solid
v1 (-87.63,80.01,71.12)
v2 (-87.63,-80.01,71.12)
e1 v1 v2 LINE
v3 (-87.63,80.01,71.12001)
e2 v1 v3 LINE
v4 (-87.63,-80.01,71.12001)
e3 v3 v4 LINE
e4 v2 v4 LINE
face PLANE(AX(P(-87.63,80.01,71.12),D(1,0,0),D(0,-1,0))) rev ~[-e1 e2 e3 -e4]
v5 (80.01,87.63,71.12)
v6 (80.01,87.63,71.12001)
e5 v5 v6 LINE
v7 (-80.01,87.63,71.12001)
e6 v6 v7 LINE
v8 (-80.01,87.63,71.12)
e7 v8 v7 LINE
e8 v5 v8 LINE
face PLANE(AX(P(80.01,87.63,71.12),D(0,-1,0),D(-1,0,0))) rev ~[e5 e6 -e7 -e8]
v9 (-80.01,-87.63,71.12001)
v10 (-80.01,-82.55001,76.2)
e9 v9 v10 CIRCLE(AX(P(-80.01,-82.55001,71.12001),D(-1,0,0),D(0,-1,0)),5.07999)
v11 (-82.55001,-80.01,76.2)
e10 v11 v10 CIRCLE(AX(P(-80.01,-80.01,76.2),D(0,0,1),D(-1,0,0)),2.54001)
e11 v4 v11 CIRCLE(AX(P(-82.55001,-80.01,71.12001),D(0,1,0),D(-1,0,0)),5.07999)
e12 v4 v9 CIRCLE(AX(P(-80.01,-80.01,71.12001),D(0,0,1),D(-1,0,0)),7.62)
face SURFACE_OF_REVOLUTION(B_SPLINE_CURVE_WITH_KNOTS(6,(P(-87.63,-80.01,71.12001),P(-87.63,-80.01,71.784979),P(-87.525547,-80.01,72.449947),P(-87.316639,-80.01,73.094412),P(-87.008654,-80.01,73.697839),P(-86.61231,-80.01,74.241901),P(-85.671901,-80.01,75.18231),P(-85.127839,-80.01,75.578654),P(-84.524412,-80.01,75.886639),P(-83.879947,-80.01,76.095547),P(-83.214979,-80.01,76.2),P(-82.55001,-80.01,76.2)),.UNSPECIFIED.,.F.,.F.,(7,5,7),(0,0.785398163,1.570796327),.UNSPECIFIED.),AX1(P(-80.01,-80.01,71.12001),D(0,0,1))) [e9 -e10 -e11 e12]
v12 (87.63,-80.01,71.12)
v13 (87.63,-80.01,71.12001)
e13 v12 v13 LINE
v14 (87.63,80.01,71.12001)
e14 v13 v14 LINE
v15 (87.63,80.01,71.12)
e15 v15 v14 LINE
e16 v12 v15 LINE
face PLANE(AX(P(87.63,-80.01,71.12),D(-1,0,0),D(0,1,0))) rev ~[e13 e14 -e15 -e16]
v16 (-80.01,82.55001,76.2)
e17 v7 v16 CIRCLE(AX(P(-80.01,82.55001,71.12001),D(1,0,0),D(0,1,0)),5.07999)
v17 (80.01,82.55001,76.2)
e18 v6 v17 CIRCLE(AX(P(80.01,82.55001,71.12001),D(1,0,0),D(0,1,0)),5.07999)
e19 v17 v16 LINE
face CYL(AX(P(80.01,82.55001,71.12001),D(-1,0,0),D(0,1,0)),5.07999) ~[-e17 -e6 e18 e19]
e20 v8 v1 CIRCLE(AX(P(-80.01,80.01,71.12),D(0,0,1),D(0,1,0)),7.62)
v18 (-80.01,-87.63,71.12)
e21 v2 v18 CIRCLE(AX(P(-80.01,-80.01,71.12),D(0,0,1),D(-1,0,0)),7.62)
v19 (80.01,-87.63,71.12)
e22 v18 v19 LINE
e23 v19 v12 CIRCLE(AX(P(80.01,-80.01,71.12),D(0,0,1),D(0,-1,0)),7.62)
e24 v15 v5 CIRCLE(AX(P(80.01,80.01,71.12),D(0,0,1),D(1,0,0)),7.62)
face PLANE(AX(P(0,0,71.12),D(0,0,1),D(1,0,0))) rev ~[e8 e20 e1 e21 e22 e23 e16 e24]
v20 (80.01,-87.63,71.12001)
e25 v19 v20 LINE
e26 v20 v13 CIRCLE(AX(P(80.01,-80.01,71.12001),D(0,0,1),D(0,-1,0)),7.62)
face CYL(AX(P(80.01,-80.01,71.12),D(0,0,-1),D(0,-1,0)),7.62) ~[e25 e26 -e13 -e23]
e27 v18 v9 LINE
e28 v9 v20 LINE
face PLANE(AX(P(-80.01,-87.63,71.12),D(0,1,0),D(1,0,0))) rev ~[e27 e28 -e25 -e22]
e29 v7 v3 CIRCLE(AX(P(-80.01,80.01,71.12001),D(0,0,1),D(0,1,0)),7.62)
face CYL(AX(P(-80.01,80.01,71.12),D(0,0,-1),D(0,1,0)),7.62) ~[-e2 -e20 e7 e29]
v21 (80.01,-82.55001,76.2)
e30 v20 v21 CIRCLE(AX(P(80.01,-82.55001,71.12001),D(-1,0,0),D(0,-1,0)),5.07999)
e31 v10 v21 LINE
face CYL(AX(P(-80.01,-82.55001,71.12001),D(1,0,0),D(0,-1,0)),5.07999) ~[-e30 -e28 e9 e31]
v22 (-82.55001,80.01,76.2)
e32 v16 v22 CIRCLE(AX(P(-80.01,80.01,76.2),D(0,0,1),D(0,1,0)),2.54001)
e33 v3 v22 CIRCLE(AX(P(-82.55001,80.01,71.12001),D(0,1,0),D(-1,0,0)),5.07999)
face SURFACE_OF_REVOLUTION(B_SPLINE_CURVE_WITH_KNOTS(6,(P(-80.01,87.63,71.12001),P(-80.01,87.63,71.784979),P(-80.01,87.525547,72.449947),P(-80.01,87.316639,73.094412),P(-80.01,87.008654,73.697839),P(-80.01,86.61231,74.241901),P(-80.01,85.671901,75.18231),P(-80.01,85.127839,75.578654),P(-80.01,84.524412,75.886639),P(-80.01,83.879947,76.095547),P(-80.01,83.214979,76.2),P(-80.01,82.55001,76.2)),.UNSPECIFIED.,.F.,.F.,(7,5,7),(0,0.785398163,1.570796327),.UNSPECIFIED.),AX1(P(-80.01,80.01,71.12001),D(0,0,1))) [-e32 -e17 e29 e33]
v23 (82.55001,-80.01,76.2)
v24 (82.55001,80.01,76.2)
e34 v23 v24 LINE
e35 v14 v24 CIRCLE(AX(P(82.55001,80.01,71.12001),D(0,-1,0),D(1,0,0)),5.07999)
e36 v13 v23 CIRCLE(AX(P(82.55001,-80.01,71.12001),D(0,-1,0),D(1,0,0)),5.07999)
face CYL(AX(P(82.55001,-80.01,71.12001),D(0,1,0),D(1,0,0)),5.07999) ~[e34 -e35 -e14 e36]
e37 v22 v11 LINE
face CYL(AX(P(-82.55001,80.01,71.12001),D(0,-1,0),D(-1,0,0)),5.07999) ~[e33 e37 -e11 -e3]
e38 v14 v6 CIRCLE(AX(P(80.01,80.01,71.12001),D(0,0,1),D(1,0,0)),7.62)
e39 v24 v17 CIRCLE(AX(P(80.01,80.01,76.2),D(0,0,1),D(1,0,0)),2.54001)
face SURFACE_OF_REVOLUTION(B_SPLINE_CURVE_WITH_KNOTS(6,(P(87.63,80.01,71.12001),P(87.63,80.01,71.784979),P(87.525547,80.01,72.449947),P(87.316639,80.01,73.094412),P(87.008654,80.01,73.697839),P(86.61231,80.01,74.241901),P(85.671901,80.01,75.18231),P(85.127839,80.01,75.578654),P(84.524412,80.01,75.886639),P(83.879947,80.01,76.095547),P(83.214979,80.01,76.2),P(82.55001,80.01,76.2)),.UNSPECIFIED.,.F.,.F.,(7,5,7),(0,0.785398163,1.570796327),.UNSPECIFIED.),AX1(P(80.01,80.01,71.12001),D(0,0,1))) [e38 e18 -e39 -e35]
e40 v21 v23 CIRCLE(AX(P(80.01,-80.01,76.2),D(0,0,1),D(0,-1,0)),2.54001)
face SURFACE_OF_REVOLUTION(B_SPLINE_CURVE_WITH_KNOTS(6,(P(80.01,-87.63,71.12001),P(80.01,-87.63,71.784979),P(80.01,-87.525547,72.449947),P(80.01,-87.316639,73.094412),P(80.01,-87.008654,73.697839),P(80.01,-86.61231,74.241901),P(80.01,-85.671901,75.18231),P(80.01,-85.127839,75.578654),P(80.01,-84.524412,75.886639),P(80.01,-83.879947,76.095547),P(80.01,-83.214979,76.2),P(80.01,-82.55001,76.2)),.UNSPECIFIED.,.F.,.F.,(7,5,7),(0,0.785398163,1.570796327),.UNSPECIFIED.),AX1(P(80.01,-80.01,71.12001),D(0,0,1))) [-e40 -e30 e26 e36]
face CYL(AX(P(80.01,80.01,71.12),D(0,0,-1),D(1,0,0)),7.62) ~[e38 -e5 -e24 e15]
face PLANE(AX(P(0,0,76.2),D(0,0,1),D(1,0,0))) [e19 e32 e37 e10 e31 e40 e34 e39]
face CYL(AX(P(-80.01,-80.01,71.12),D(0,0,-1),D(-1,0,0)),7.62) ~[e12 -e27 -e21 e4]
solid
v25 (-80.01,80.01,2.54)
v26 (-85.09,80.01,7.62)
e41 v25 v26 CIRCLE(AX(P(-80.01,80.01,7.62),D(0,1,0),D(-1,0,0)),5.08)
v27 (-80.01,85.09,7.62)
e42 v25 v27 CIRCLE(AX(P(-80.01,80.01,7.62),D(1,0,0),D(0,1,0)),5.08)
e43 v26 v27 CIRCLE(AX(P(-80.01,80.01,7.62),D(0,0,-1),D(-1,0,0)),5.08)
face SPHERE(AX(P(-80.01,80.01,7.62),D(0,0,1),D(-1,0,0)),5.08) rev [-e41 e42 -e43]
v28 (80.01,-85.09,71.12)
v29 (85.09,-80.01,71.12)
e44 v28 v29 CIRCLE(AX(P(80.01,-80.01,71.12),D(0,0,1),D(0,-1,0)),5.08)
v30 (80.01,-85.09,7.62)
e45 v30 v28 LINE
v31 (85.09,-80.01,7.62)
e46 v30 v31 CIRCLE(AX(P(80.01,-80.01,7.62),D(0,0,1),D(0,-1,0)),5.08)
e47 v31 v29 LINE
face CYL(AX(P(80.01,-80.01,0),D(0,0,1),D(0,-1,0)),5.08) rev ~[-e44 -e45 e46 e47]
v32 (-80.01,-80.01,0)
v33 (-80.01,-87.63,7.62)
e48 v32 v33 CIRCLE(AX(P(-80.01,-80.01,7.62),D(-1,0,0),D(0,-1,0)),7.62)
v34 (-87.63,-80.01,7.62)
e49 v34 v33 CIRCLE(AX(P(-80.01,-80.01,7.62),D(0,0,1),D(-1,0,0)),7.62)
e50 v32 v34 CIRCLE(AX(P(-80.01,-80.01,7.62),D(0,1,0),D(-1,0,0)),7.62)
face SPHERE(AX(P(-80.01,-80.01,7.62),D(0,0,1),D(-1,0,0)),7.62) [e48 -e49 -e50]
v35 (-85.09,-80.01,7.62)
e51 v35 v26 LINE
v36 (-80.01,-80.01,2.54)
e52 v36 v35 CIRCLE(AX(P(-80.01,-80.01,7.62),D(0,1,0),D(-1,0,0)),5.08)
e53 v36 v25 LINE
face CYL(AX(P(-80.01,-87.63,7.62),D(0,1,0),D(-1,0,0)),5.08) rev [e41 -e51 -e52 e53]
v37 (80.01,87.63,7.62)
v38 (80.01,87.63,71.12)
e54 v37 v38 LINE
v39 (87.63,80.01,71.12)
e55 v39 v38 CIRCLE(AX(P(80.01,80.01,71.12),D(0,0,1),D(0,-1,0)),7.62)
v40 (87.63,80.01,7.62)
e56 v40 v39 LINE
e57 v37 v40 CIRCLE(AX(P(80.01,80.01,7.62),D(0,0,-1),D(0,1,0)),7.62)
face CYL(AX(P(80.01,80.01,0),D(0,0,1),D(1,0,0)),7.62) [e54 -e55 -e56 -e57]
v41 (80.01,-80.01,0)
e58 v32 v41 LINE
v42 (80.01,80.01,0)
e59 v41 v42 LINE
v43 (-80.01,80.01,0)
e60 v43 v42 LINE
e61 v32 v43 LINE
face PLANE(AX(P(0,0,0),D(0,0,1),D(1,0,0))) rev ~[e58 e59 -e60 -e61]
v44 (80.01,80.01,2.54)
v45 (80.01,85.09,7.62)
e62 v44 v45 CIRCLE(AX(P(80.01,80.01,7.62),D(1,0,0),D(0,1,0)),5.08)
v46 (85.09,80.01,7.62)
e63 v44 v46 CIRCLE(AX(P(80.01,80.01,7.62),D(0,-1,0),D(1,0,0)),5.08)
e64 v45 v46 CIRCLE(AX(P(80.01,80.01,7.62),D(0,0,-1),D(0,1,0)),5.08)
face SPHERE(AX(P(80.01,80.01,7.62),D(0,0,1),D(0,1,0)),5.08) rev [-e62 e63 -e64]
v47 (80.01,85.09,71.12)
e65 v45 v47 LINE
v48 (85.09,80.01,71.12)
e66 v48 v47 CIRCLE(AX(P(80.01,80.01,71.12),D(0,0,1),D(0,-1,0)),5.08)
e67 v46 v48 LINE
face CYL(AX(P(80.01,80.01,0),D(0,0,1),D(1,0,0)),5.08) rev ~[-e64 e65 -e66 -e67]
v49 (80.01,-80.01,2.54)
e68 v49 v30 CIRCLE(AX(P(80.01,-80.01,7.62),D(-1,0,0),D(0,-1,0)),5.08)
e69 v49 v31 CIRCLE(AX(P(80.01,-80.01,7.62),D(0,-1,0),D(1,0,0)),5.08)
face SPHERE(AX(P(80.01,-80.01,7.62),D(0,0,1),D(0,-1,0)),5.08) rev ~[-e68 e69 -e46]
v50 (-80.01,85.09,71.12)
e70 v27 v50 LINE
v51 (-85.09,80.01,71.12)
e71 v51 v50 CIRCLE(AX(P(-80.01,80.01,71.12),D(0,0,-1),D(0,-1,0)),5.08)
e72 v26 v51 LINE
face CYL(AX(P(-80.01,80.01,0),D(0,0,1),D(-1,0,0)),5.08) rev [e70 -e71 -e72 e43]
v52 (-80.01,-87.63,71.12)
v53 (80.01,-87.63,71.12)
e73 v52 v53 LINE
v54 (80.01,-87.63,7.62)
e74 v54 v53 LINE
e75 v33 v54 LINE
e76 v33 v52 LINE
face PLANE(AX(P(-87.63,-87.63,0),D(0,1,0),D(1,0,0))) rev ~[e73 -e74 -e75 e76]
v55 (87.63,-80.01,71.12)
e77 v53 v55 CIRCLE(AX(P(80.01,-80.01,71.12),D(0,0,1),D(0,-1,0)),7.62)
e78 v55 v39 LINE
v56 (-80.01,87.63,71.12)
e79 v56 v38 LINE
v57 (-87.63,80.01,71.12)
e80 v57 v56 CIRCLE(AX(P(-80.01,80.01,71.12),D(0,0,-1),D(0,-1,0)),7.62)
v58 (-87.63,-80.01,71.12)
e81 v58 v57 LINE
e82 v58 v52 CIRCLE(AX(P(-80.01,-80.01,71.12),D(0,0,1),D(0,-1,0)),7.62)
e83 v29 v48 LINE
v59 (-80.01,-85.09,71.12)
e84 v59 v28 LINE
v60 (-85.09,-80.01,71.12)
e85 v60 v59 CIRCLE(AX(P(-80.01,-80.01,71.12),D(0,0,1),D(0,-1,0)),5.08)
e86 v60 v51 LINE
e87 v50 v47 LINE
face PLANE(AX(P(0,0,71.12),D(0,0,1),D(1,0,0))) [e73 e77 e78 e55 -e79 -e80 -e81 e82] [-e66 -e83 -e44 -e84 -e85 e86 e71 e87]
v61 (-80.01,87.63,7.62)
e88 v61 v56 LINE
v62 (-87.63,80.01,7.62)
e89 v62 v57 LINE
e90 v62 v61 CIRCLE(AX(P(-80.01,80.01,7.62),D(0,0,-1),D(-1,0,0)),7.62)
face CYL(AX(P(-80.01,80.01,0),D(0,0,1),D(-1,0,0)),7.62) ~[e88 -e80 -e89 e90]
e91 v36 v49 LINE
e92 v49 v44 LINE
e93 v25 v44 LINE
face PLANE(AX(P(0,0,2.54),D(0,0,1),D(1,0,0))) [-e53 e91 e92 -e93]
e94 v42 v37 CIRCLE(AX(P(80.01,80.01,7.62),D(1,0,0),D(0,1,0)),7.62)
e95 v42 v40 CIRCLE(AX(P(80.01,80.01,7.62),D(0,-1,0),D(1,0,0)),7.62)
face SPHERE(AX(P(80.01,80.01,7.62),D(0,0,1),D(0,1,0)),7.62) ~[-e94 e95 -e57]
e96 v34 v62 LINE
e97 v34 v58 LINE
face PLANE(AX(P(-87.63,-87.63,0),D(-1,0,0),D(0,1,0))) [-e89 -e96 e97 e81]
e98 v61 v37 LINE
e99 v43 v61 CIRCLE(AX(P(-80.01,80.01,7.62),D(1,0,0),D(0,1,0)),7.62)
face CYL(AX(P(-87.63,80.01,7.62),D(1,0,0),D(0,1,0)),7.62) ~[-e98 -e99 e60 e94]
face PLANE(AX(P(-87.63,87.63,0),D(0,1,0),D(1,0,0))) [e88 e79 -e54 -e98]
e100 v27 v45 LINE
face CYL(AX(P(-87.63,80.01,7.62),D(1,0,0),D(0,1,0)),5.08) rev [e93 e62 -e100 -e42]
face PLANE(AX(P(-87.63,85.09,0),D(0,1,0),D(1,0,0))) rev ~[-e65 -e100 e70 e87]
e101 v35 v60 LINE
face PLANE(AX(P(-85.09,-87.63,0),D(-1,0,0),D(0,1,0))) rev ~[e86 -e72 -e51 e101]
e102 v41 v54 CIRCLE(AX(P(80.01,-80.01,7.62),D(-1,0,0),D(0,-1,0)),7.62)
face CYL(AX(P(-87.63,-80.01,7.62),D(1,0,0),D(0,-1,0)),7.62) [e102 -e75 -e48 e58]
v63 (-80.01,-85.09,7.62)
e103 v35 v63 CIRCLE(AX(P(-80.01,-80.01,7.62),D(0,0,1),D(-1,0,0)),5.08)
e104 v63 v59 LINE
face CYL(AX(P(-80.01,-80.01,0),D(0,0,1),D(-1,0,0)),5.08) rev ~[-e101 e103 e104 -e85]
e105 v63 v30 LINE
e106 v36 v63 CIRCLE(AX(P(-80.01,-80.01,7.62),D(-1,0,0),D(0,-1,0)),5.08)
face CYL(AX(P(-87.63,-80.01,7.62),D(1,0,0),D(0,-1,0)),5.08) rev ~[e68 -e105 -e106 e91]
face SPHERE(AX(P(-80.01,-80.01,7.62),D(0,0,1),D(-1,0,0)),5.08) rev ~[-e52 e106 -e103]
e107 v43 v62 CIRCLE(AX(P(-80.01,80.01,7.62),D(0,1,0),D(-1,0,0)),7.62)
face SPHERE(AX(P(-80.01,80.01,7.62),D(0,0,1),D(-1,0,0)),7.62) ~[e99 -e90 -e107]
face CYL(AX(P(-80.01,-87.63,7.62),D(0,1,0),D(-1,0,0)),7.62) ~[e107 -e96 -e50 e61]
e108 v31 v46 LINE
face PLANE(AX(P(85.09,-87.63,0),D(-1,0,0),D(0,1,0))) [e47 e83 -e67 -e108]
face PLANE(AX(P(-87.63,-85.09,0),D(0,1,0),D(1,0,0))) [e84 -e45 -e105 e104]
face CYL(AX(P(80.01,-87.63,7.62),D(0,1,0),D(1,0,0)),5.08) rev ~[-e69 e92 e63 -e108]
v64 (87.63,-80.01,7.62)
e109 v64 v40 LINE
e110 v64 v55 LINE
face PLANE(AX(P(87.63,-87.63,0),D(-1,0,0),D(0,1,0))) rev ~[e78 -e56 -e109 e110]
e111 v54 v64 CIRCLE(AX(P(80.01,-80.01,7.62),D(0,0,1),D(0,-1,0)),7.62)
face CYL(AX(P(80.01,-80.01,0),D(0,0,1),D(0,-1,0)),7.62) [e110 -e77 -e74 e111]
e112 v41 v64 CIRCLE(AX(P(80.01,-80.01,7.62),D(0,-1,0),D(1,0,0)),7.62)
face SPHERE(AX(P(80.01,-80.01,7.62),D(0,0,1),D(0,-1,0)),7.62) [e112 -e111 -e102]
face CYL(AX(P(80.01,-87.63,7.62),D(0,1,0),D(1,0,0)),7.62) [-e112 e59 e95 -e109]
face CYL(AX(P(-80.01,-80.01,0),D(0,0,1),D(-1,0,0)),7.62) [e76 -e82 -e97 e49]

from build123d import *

# Parameters (mm, degrees)
F0_W     = 175.26
F0_H     = 175.26
F1_DEPTH = 71.12
F2_R     = 7.62
F3_T     = -2.54
F5_DEPTH = 5.08
F6_R     = 5.07999


# Not quite as in the source:
# - a fillet or chamfer is up to 0.001 mm smaller than in the source, because OpenCascade refuses the exact size


with BuildPart() as f1:
    # F0 (on Top) → F1 (new body)
    with BuildSketch(Plane.XY):
        Rectangle(F0_W, F0_H)
    extrude(amount=F1_DEPTH)

    # F2
    f2_edges = [f1.edges().sort_by_distance(p)[0] for p in [
        (-87.63, 87.63, 35.56),
        (87.63, 87.63, 35.56),
        (-87.63, -87.63, 35.56),
        (87.63, -87.63, 35.56),
        (-87.63, 0, 0),
        (0, -87.63, 0),
        (0, 87.63, 0),
        (87.63, 0, 0),
    ]]
    fillet(f2_edges, radius=F2_R)

    # F3
    f3_openings = [f1.faces().sort_by_distance(p)[0] for p in [
        (0, 0, 71.12),
    ]]
    offset(amount=F3_T, openings=f3_openings)


with BuildPart() as f5:
    # F4 (on face) → F5 (new body)
    with BuildSketch(Plane.XY.offset(71.12)):
        with BuildLine():
            Line((80.01, 87.63), (-80.01, 87.63))
            ThreePointArc((-80.01, 87.63), (-85.3981536726, 85.3981536726), (-87.63, 80.01))
            Line((-87.63, 80.01), (-87.63, -80.01))
            ThreePointArc((-87.63, -80.01), (-85.3981536726, -85.3981536726), (-80.01, -87.63))
            Line((-80.01, -87.63), (80.01, -87.63))
            ThreePointArc((80.01, -87.63), (85.3981536726, -85.3981536726), (87.63, -80.01))
            Line((87.63, -80.01), (87.63, 80.01))
            ThreePointArc((87.63, 80.01), (85.3981536726, 85.3981536726), (80.01, 87.63))
        make_face()
    extrude(amount=F5_DEPTH)

    # F6 (radius 5.08 in the source; OpenCascade refuses exactly that, so slightly less here)
    f6_edges = [f5.edges().sort_by_distance(p)[0] for p in [
        (87.63, 0, 76.2),
    ]]
    fillet(f6_edges, radius=F6_R)


solid = Compound([f1.part, f5.part])
